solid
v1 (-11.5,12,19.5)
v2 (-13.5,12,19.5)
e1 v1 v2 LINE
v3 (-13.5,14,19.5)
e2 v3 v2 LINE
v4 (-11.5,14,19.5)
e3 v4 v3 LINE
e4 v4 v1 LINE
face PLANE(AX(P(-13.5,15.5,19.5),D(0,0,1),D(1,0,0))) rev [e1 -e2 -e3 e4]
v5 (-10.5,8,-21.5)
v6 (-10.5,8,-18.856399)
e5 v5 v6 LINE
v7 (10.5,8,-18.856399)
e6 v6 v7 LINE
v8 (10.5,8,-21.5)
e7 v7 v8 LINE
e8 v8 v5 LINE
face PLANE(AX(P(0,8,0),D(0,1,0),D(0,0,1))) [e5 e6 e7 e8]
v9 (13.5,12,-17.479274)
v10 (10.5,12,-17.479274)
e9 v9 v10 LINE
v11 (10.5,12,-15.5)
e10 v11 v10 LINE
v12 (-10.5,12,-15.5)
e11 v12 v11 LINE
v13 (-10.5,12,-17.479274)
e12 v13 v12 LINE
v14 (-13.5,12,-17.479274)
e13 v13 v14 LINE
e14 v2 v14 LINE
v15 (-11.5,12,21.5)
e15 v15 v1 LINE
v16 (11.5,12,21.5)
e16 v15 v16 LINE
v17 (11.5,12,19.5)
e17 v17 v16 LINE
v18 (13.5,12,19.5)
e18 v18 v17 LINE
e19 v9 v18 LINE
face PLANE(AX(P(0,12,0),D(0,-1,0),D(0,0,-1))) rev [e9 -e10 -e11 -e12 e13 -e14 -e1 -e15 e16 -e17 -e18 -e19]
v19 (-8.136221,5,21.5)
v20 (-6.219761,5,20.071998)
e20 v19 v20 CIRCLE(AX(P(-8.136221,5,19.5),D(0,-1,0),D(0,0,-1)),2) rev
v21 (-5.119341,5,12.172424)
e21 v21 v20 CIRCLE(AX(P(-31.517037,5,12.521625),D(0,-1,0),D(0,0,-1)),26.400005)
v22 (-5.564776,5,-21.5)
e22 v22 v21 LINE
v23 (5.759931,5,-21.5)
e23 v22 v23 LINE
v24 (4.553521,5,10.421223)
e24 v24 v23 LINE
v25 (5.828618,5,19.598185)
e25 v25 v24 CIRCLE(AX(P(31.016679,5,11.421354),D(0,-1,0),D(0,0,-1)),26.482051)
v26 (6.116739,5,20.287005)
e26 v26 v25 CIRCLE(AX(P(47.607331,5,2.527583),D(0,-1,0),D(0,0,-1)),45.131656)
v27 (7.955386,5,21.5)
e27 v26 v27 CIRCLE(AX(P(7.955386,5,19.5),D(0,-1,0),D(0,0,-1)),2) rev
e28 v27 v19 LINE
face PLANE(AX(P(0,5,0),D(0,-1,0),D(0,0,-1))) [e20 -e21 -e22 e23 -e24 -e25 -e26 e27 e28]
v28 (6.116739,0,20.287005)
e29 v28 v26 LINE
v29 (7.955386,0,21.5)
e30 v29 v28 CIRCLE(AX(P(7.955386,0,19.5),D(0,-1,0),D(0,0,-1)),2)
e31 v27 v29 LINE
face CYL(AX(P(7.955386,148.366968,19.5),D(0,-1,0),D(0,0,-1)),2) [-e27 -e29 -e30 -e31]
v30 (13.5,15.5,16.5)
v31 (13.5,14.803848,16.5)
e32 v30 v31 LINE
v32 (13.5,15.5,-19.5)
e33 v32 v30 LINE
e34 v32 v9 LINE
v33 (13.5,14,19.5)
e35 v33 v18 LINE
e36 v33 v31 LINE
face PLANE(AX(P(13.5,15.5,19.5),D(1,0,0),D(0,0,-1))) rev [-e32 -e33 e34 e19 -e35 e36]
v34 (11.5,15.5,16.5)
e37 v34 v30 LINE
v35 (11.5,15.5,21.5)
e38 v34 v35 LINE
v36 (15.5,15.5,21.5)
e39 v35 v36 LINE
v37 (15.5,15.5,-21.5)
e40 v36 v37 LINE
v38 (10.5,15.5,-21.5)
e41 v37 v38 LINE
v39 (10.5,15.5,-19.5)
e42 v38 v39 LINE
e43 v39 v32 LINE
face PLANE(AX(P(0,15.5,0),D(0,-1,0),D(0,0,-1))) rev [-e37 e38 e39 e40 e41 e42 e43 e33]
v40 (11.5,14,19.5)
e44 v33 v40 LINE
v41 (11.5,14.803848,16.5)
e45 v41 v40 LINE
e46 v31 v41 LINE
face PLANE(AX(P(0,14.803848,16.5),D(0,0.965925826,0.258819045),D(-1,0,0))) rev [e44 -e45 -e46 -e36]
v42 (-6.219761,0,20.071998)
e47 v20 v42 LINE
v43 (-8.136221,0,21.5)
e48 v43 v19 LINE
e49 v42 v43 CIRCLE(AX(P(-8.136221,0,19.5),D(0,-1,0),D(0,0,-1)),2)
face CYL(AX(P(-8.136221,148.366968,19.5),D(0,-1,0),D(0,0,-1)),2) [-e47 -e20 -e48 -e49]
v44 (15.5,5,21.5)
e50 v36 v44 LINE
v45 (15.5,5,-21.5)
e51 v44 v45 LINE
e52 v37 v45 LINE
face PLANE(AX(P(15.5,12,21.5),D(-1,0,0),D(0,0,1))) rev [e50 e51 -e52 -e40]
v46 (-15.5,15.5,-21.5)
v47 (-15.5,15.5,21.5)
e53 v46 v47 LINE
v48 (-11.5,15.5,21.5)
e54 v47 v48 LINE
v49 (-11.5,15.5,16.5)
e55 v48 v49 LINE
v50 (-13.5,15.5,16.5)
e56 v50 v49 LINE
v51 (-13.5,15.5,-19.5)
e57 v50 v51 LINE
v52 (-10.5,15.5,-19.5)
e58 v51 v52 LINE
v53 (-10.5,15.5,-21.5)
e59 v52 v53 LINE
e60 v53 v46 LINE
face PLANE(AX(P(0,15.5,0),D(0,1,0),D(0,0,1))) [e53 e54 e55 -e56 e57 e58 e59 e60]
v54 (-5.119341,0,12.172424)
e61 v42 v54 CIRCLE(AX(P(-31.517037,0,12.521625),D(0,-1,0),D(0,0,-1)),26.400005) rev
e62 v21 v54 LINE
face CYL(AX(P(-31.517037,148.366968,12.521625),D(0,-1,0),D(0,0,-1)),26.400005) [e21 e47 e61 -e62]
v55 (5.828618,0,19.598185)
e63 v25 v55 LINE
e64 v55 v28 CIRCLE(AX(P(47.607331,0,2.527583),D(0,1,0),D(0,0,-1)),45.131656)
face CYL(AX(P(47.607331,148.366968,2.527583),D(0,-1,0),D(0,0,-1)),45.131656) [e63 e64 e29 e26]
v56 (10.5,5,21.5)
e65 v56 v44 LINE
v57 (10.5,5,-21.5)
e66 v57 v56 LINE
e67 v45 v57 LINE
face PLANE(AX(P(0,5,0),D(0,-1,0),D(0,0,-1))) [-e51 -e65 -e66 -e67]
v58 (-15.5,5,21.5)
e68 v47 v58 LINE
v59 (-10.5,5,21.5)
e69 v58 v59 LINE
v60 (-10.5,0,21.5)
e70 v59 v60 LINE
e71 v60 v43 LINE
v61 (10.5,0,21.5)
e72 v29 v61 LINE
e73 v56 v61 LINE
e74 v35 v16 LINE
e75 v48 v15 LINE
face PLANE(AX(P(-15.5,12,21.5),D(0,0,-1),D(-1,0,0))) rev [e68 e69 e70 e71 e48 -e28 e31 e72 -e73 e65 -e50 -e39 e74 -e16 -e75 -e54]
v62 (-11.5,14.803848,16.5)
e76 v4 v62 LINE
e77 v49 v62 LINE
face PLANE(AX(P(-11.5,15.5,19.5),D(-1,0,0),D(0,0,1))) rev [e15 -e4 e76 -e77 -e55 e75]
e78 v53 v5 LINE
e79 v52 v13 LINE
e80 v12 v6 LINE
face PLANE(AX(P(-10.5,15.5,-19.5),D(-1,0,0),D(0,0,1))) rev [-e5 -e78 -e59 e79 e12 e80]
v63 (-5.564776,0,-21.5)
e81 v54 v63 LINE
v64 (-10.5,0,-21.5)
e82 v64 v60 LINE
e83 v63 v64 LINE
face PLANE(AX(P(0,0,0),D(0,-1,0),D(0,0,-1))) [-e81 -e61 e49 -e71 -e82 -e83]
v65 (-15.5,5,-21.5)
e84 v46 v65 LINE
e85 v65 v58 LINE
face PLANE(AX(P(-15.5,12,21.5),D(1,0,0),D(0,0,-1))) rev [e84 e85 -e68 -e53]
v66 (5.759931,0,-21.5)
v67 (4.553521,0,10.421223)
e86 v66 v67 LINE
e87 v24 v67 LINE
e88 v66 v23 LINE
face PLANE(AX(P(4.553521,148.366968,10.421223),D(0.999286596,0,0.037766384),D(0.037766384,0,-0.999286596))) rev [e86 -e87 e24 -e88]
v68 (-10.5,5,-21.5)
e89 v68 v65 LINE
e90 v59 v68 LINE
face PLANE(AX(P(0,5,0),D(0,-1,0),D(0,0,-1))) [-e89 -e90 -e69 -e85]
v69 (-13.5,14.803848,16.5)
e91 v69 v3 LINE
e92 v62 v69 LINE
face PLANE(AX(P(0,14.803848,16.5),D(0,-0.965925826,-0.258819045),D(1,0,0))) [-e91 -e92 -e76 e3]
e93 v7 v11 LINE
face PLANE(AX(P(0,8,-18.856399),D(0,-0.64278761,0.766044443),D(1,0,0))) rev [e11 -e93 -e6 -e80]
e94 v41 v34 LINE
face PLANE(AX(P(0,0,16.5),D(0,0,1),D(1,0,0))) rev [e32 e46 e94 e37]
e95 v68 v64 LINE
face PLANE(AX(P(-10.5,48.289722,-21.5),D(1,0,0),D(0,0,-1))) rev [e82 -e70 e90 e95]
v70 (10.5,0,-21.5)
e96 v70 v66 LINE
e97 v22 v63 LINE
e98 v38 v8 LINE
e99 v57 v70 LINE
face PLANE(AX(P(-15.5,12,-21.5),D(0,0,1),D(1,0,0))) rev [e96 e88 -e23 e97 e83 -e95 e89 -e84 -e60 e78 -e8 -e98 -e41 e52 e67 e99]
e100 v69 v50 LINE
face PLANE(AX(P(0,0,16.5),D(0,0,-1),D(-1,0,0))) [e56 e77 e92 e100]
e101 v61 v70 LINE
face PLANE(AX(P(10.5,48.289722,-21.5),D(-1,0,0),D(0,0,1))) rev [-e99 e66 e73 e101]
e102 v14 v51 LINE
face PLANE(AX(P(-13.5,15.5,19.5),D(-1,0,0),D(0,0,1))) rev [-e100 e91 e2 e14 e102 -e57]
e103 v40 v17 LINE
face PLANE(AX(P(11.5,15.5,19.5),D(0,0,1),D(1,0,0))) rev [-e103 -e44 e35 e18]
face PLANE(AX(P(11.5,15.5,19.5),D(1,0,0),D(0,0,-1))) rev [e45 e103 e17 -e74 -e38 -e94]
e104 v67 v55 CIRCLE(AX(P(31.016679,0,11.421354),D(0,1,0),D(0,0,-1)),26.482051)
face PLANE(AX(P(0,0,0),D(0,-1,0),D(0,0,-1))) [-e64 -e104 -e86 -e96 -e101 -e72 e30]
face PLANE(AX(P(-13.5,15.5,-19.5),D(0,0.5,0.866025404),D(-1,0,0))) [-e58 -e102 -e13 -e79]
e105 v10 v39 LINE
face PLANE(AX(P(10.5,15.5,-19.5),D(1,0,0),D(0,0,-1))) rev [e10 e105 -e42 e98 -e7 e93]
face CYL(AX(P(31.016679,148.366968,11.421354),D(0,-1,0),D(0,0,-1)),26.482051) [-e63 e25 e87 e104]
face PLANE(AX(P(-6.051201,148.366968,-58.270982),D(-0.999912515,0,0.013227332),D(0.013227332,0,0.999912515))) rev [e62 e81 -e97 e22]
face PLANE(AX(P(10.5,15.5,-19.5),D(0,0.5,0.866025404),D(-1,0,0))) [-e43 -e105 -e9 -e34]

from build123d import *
from OCP.BRepFilletAPI import BRepFilletAPI_MakeChamfer

# Parameters (mm, degrees)
SZKIC1_W                    = 31
SZKIC1_H                    = 43
DODANIE_WYCI_GNI_CIE1_DEPTH = 12
DODANIE_WYCI_GNI_CIE3_DEPTH = 5
SZKIC4_W                    = 5
SZKIC4_H                    = 43
WYTNIJ_WYCI_GNI_CIE1_DEPTH  = 5
DODANIE_WYCI_GNI_CIE4_DEPTH = 3.5
SZKIC6_W                    = 21
SZKIC6_H                    = 6
WYTNIJ_WYCI_GNI_CIE2_DEPTH  = 4
SFAZOWANIE1_SIZE2           = 3.356398525
SFAZOWANIE1_SIZE            = 4
SFAZOWANIE2_SIZE            = 2.020725942
SFAZOWANIE2_SIZE_2          = 3.5
ZAOKR_GLENIE2_R             = 2
SZKIC7_W                    = 2
SZKIC7_H                    = 1.5
DODANIE_WYCI_GNI_CIE5_DEPTH = 3
SFAZOWANIE3_SIZE            = 3
SFAZOWANIE3_SIZE_2          = 0.803847577


with BuildPart() as part:
    # Szkic1 → Dodanie-wyciągnięcie1 (new body)
    with BuildSketch(Plane(origin=(0, 0, 0), x_dir=(1, 0, 0), z_dir=(0, 1, 0))):
        Rectangle(SZKIC1_W, SZKIC1_H)
    extrude(amount=DODANIE_WYCI_GNI_CIE1_DEPTH)


with BuildPart() as body_2:
    # Szkic3 → Dodanie-wyciągnięcie3 (new body)
    with BuildSketch(Plane.XZ):
        with BuildLine():
            Line((-10.212337084, 28.112329696), (-14.125358878, 33.459474506))
            ThreePointArc((-14.125358878, 33.459474506), (-14.461615087, 35.767305941), (-12.741502742, 37.342224254))
            ThreePointArc((-12.741502742, 37.342224254), (-8.998415843, 41.011293853), (-10.279093338, 46.09387552))
            Line((-10.279093338, 46.09387552), (-15.166024728, 51.154438355))
            ThreePointArc((-15.166024728, 51.154438355), (-15.686793901, 52.037661779), (-15.750705614, 53.06098941))
            ThreePointArc((-15.750705614, 53.06098941), (-13.686472686, 56.384695233), (-10.429010158, 58.55195522))
            ThreePointArc((-10.429010158, 58.55195522), (-9.157993267, 58.652708308), (-8.044536022, 58.031541594))
            Line((-8.044536022, 58.031541594), (-4.224518095, 54.075788657))
            ThreePointArc((-4.224518095, 54.075788657), (0.407878305, 52.061536199), (5.107784388, 53.912803922))
            Line((5.107784388, 53.912803922), (9.063616274, 57.732769227))
            ThreePointArc((9.063616274, 57.732769227), (9.946850008, 58.253523329), (10.970179942, 58.317417838))
            ThreePointArc((10.970179942, 58.317417838), (12.642937927, 57.562348173), (14.103566869, 56.451126968))
            ThreePointArc((14.103566869, 56.451126968), (15.47806196, 54.856926305), (16.461051962, 52.995624834))
            ThreePointArc((16.461051962, 52.995624834), (16.56178137, 51.724613884), (15.94059861, 50.611174515))
            Line((15.94059861, 50.611174515), (10.879953282, 45.72434942))
            ThreePointArc((10.879953282, 45.72434942), (9.272518926, 41.94367997), (10.871160741, 38.159284239))
            ThreePointArc((10.871160741, 38.159284239), (11.521401414, 37.62253212), (12.248997344, 37.19648056))
            ThreePointArc((12.248997344, 37.19648056), (13.149955836, 36.868062858), (13.971590322, 36.373592268))
            ThreePointArc((13.971590322, 36.373592268), (14.805880692, 34.730389937), (14.282706099, 32.963346456))
            ThreePointArc((14.282706099, 32.963346456), (9.465690514, 26.653949977), (5.828617709, 19.59818464))
            ThreePointArc((5.828617709, 19.59818464), (4.786614899, 15.065901025), (4.553521224, 10.421223215))
            Line((4.553521224, 10.421223215), (7.14350853, -58.109023822))
            ThreePointArc((7.14350853, -58.109023822), (7.019012284, -59.657823394), (6.535877134, -61.134596855))
            Line((6.535877134, -61.134596855), (1.314918151, -72.39460248))
            ThreePointArc((1.314918151, -72.39460248), (-1.069105556, -73.746830857), (-3.119902204, -71.928500927))
            Line((-3.119902204, -71.928500927), (-5.8858069, -59.829088544))
            ThreePointArc((-5.8858069, -59.829088544), (-6.014905284, -59.054960819), (-6.051200692, -58.27098201))
            Line((-6.051200692, -58.27098201), (-5.119340887, 12.172423843))
            ThreePointArc((-5.119340887, 12.172423843), (-6.369476529, 20.556580537), (-10.212337084, 28.112329696))
        make_face()
    extrude(amount=-DODANIE_WYCI_GNI_CIE3_DEPTH)


with BuildPart() as part_1:
    add(part.part)

    # Połącz1: cut body 2
    add(body_2.part, mode=Mode.SUBTRACT)

    # Szkic4 → Wytnij-wyciągnięcie1 (cut)
    with BuildSketch(Plane.XZ):
        with Locations((13, 0)):
            Rectangle(SZKIC4_W, SZKIC4_H)
        with Locations((-13, 0)):
            Rectangle(SZKIC4_W, SZKIC4_H)
    extrude(amount=-WYTNIJ_WYCI_GNI_CIE1_DEPTH, mode=Mode.SUBTRACT)

    # Szkic5 → Dodanie-wyciągnięcie4 (add)
    with BuildSketch(Plane(origin=(0, 12, 0), x_dir=(1, 0, 0), z_dir=(0, 1, 0))):
        Polygon((10.5, 19.5), (10.5, 21.5), (15.5, 21.5), (15.5, -21.5), (11.5, -21.5), (11.5, -19.5), (13.5, -19.5), (13.5, 19.5), align=None)
        Polygon((-15.5, 21.5), (-15.5, -21.5), (-11.5, -21.5), (-11.5, -19.5), (-13.5, -19.5), (-13.5, 19.5), (-10.5, 19.5), (-10.5, 21.5), align=None)
    extrude(amount=DODANIE_WYCI_GNI_CIE4_DEPTH)

    # Szkic6 → Wytnij-wyciągnięcie2 (cut)
    with BuildSketch(Plane(origin=(0, 12, 0), x_dir=(1, 0, 0), z_dir=(0, 1, 0))):
        with Locations((0, 18.5)):
            Rectangle(SZKIC6_W, SZKIC6_H)
    extrude(amount=-WYTNIJ_WYCI_GNI_CIE2_DEPTH, mode=Mode.SUBTRACT)

    # Sfazowanie1
    sfazowanie1_edges = [part_1.edges().sort_by_distance(p)[0] for p in [
        (0, 8, -15.5),
    ]]
    sfazowanie1_side = [part_1.faces().sort_by_distance(p)[0] for p in [
        (0, 8.06712797, -15.5),
    ]]
    chamfer(sfazowanie1_edges, length=SFAZOWANIE1_SIZE - 0.0001, length2=SFAZOWANIE1_SIZE2 - 0.0001, reference=sfazowanie1_side[0])  # a hair under: the kernel refuses the full size

    # Sfazowanie2
    sfazowanie2_edges_1 = [part_1.edges().sort_by_distance(p)[0] for p in [
        (12, 12, -19.5),
    ]]
    sfazowanie2_side_1 = [part_1.faces().sort_by_distance(p)[0] for p in [
        (12, 12, -19.459585481),
    ]]
    sfazowanie2_edges_2 = [part_1.edges().sort_by_distance(p)[0] for p in [
        (-12, 12, -19.5),
    ]]
    sfazowanie2_side_2 = [part_1.faces().sort_by_distance(p)[0] for p in [
        (-12, 12, -19.459585481),
    ]]
    sfazowanie2 = BRepFilletAPI_MakeChamfer(part_1.part.solid().wrapped)
    for e in sfazowanie2_edges_1:
        sfazowanie2.Add(SFAZOWANIE2_SIZE - 0.0001, SFAZOWANIE2_SIZE_2 - 0.0001, e.wrapped, sfazowanie2_side_1[0].wrapped)
    for e in sfazowanie2_edges_2:
        sfazowanie2.Add(SFAZOWANIE2_SIZE - 0.0001, SFAZOWANIE2_SIZE_2 - 0.0001, e.wrapped, sfazowanie2_side_2[0].wrapped)
    add(Compound.cast(sfazowanie2.Shape()), mode=Mode.REPLACE)  # a hair under: the kernel refuses the full size

    # Zaokrąglenie2
    zaokr_glenie2_edges = [part_1.edges().sort_by_distance(p)[0] for p in [
        (-6.690658064, 2.5, 21.5),
        (6.65719404, 2.5, 21.5),
    ]]
    fillet(zaokr_glenie2_edges, radius=ZAOKR_GLENIE2_R)

    # Szkic7 → Dodanie-wyciągnięcie5 (add)
    with BuildSketch(Plane(origin=(0, 0, 19.5), x_dir=(-1, 0, 0), z_dir=(0, 0, -1))):
        with Locations((12.5, 14.75)):
            Rectangle(SZKIC7_W, SZKIC7_H)
        with Locations((-12.5, 14.75)):
            Rectangle(SZKIC7_W, SZKIC7_H)
    extrude(amount=DODANIE_WYCI_GNI_CIE5_DEPTH)

    # Sfazowanie3
    sfazowanie3_edges_1 = [part_1.edges().sort_by_distance(p)[0] for p in [
        (-12.5, 14, 16.5),
    ]]
    sfazowanie3_side_1 = [part_1.faces().sort_by_distance(p)[0] for p in [
        (-12.5, 14, 16.516076952),
    ]]
    sfazowanie3_edges_2 = [part_1.edges().sort_by_distance(p)[0] for p in [
        (12.5, 14, 16.5),
    ]]
    sfazowanie3_side_2 = [part_1.faces().sort_by_distance(p)[0] for p in [
        (12.5, 14, 16.516076952),
    ]]
    sfazowanie3 = BRepFilletAPI_MakeChamfer(part_1.part.solid().wrapped)
    for e in sfazowanie3_edges_1:
        sfazowanie3.Add(SFAZOWANIE3_SIZE - 0.0001, SFAZOWANIE3_SIZE_2 - 0.0001, e.wrapped, sfazowanie3_side_1[0].wrapped)
    for e in sfazowanie3_edges_2:
        sfazowanie3.Add(SFAZOWANIE3_SIZE - 0.0001, SFAZOWANIE3_SIZE_2 - 0.0001, e.wrapped, sfazowanie3_side_2[0].wrapped)
    add(Compound.cast(sfazowanie3.Shape()), mode=Mode.REPLACE)  # a hair under: the kernel refuses the full size


solid = part_1.part
